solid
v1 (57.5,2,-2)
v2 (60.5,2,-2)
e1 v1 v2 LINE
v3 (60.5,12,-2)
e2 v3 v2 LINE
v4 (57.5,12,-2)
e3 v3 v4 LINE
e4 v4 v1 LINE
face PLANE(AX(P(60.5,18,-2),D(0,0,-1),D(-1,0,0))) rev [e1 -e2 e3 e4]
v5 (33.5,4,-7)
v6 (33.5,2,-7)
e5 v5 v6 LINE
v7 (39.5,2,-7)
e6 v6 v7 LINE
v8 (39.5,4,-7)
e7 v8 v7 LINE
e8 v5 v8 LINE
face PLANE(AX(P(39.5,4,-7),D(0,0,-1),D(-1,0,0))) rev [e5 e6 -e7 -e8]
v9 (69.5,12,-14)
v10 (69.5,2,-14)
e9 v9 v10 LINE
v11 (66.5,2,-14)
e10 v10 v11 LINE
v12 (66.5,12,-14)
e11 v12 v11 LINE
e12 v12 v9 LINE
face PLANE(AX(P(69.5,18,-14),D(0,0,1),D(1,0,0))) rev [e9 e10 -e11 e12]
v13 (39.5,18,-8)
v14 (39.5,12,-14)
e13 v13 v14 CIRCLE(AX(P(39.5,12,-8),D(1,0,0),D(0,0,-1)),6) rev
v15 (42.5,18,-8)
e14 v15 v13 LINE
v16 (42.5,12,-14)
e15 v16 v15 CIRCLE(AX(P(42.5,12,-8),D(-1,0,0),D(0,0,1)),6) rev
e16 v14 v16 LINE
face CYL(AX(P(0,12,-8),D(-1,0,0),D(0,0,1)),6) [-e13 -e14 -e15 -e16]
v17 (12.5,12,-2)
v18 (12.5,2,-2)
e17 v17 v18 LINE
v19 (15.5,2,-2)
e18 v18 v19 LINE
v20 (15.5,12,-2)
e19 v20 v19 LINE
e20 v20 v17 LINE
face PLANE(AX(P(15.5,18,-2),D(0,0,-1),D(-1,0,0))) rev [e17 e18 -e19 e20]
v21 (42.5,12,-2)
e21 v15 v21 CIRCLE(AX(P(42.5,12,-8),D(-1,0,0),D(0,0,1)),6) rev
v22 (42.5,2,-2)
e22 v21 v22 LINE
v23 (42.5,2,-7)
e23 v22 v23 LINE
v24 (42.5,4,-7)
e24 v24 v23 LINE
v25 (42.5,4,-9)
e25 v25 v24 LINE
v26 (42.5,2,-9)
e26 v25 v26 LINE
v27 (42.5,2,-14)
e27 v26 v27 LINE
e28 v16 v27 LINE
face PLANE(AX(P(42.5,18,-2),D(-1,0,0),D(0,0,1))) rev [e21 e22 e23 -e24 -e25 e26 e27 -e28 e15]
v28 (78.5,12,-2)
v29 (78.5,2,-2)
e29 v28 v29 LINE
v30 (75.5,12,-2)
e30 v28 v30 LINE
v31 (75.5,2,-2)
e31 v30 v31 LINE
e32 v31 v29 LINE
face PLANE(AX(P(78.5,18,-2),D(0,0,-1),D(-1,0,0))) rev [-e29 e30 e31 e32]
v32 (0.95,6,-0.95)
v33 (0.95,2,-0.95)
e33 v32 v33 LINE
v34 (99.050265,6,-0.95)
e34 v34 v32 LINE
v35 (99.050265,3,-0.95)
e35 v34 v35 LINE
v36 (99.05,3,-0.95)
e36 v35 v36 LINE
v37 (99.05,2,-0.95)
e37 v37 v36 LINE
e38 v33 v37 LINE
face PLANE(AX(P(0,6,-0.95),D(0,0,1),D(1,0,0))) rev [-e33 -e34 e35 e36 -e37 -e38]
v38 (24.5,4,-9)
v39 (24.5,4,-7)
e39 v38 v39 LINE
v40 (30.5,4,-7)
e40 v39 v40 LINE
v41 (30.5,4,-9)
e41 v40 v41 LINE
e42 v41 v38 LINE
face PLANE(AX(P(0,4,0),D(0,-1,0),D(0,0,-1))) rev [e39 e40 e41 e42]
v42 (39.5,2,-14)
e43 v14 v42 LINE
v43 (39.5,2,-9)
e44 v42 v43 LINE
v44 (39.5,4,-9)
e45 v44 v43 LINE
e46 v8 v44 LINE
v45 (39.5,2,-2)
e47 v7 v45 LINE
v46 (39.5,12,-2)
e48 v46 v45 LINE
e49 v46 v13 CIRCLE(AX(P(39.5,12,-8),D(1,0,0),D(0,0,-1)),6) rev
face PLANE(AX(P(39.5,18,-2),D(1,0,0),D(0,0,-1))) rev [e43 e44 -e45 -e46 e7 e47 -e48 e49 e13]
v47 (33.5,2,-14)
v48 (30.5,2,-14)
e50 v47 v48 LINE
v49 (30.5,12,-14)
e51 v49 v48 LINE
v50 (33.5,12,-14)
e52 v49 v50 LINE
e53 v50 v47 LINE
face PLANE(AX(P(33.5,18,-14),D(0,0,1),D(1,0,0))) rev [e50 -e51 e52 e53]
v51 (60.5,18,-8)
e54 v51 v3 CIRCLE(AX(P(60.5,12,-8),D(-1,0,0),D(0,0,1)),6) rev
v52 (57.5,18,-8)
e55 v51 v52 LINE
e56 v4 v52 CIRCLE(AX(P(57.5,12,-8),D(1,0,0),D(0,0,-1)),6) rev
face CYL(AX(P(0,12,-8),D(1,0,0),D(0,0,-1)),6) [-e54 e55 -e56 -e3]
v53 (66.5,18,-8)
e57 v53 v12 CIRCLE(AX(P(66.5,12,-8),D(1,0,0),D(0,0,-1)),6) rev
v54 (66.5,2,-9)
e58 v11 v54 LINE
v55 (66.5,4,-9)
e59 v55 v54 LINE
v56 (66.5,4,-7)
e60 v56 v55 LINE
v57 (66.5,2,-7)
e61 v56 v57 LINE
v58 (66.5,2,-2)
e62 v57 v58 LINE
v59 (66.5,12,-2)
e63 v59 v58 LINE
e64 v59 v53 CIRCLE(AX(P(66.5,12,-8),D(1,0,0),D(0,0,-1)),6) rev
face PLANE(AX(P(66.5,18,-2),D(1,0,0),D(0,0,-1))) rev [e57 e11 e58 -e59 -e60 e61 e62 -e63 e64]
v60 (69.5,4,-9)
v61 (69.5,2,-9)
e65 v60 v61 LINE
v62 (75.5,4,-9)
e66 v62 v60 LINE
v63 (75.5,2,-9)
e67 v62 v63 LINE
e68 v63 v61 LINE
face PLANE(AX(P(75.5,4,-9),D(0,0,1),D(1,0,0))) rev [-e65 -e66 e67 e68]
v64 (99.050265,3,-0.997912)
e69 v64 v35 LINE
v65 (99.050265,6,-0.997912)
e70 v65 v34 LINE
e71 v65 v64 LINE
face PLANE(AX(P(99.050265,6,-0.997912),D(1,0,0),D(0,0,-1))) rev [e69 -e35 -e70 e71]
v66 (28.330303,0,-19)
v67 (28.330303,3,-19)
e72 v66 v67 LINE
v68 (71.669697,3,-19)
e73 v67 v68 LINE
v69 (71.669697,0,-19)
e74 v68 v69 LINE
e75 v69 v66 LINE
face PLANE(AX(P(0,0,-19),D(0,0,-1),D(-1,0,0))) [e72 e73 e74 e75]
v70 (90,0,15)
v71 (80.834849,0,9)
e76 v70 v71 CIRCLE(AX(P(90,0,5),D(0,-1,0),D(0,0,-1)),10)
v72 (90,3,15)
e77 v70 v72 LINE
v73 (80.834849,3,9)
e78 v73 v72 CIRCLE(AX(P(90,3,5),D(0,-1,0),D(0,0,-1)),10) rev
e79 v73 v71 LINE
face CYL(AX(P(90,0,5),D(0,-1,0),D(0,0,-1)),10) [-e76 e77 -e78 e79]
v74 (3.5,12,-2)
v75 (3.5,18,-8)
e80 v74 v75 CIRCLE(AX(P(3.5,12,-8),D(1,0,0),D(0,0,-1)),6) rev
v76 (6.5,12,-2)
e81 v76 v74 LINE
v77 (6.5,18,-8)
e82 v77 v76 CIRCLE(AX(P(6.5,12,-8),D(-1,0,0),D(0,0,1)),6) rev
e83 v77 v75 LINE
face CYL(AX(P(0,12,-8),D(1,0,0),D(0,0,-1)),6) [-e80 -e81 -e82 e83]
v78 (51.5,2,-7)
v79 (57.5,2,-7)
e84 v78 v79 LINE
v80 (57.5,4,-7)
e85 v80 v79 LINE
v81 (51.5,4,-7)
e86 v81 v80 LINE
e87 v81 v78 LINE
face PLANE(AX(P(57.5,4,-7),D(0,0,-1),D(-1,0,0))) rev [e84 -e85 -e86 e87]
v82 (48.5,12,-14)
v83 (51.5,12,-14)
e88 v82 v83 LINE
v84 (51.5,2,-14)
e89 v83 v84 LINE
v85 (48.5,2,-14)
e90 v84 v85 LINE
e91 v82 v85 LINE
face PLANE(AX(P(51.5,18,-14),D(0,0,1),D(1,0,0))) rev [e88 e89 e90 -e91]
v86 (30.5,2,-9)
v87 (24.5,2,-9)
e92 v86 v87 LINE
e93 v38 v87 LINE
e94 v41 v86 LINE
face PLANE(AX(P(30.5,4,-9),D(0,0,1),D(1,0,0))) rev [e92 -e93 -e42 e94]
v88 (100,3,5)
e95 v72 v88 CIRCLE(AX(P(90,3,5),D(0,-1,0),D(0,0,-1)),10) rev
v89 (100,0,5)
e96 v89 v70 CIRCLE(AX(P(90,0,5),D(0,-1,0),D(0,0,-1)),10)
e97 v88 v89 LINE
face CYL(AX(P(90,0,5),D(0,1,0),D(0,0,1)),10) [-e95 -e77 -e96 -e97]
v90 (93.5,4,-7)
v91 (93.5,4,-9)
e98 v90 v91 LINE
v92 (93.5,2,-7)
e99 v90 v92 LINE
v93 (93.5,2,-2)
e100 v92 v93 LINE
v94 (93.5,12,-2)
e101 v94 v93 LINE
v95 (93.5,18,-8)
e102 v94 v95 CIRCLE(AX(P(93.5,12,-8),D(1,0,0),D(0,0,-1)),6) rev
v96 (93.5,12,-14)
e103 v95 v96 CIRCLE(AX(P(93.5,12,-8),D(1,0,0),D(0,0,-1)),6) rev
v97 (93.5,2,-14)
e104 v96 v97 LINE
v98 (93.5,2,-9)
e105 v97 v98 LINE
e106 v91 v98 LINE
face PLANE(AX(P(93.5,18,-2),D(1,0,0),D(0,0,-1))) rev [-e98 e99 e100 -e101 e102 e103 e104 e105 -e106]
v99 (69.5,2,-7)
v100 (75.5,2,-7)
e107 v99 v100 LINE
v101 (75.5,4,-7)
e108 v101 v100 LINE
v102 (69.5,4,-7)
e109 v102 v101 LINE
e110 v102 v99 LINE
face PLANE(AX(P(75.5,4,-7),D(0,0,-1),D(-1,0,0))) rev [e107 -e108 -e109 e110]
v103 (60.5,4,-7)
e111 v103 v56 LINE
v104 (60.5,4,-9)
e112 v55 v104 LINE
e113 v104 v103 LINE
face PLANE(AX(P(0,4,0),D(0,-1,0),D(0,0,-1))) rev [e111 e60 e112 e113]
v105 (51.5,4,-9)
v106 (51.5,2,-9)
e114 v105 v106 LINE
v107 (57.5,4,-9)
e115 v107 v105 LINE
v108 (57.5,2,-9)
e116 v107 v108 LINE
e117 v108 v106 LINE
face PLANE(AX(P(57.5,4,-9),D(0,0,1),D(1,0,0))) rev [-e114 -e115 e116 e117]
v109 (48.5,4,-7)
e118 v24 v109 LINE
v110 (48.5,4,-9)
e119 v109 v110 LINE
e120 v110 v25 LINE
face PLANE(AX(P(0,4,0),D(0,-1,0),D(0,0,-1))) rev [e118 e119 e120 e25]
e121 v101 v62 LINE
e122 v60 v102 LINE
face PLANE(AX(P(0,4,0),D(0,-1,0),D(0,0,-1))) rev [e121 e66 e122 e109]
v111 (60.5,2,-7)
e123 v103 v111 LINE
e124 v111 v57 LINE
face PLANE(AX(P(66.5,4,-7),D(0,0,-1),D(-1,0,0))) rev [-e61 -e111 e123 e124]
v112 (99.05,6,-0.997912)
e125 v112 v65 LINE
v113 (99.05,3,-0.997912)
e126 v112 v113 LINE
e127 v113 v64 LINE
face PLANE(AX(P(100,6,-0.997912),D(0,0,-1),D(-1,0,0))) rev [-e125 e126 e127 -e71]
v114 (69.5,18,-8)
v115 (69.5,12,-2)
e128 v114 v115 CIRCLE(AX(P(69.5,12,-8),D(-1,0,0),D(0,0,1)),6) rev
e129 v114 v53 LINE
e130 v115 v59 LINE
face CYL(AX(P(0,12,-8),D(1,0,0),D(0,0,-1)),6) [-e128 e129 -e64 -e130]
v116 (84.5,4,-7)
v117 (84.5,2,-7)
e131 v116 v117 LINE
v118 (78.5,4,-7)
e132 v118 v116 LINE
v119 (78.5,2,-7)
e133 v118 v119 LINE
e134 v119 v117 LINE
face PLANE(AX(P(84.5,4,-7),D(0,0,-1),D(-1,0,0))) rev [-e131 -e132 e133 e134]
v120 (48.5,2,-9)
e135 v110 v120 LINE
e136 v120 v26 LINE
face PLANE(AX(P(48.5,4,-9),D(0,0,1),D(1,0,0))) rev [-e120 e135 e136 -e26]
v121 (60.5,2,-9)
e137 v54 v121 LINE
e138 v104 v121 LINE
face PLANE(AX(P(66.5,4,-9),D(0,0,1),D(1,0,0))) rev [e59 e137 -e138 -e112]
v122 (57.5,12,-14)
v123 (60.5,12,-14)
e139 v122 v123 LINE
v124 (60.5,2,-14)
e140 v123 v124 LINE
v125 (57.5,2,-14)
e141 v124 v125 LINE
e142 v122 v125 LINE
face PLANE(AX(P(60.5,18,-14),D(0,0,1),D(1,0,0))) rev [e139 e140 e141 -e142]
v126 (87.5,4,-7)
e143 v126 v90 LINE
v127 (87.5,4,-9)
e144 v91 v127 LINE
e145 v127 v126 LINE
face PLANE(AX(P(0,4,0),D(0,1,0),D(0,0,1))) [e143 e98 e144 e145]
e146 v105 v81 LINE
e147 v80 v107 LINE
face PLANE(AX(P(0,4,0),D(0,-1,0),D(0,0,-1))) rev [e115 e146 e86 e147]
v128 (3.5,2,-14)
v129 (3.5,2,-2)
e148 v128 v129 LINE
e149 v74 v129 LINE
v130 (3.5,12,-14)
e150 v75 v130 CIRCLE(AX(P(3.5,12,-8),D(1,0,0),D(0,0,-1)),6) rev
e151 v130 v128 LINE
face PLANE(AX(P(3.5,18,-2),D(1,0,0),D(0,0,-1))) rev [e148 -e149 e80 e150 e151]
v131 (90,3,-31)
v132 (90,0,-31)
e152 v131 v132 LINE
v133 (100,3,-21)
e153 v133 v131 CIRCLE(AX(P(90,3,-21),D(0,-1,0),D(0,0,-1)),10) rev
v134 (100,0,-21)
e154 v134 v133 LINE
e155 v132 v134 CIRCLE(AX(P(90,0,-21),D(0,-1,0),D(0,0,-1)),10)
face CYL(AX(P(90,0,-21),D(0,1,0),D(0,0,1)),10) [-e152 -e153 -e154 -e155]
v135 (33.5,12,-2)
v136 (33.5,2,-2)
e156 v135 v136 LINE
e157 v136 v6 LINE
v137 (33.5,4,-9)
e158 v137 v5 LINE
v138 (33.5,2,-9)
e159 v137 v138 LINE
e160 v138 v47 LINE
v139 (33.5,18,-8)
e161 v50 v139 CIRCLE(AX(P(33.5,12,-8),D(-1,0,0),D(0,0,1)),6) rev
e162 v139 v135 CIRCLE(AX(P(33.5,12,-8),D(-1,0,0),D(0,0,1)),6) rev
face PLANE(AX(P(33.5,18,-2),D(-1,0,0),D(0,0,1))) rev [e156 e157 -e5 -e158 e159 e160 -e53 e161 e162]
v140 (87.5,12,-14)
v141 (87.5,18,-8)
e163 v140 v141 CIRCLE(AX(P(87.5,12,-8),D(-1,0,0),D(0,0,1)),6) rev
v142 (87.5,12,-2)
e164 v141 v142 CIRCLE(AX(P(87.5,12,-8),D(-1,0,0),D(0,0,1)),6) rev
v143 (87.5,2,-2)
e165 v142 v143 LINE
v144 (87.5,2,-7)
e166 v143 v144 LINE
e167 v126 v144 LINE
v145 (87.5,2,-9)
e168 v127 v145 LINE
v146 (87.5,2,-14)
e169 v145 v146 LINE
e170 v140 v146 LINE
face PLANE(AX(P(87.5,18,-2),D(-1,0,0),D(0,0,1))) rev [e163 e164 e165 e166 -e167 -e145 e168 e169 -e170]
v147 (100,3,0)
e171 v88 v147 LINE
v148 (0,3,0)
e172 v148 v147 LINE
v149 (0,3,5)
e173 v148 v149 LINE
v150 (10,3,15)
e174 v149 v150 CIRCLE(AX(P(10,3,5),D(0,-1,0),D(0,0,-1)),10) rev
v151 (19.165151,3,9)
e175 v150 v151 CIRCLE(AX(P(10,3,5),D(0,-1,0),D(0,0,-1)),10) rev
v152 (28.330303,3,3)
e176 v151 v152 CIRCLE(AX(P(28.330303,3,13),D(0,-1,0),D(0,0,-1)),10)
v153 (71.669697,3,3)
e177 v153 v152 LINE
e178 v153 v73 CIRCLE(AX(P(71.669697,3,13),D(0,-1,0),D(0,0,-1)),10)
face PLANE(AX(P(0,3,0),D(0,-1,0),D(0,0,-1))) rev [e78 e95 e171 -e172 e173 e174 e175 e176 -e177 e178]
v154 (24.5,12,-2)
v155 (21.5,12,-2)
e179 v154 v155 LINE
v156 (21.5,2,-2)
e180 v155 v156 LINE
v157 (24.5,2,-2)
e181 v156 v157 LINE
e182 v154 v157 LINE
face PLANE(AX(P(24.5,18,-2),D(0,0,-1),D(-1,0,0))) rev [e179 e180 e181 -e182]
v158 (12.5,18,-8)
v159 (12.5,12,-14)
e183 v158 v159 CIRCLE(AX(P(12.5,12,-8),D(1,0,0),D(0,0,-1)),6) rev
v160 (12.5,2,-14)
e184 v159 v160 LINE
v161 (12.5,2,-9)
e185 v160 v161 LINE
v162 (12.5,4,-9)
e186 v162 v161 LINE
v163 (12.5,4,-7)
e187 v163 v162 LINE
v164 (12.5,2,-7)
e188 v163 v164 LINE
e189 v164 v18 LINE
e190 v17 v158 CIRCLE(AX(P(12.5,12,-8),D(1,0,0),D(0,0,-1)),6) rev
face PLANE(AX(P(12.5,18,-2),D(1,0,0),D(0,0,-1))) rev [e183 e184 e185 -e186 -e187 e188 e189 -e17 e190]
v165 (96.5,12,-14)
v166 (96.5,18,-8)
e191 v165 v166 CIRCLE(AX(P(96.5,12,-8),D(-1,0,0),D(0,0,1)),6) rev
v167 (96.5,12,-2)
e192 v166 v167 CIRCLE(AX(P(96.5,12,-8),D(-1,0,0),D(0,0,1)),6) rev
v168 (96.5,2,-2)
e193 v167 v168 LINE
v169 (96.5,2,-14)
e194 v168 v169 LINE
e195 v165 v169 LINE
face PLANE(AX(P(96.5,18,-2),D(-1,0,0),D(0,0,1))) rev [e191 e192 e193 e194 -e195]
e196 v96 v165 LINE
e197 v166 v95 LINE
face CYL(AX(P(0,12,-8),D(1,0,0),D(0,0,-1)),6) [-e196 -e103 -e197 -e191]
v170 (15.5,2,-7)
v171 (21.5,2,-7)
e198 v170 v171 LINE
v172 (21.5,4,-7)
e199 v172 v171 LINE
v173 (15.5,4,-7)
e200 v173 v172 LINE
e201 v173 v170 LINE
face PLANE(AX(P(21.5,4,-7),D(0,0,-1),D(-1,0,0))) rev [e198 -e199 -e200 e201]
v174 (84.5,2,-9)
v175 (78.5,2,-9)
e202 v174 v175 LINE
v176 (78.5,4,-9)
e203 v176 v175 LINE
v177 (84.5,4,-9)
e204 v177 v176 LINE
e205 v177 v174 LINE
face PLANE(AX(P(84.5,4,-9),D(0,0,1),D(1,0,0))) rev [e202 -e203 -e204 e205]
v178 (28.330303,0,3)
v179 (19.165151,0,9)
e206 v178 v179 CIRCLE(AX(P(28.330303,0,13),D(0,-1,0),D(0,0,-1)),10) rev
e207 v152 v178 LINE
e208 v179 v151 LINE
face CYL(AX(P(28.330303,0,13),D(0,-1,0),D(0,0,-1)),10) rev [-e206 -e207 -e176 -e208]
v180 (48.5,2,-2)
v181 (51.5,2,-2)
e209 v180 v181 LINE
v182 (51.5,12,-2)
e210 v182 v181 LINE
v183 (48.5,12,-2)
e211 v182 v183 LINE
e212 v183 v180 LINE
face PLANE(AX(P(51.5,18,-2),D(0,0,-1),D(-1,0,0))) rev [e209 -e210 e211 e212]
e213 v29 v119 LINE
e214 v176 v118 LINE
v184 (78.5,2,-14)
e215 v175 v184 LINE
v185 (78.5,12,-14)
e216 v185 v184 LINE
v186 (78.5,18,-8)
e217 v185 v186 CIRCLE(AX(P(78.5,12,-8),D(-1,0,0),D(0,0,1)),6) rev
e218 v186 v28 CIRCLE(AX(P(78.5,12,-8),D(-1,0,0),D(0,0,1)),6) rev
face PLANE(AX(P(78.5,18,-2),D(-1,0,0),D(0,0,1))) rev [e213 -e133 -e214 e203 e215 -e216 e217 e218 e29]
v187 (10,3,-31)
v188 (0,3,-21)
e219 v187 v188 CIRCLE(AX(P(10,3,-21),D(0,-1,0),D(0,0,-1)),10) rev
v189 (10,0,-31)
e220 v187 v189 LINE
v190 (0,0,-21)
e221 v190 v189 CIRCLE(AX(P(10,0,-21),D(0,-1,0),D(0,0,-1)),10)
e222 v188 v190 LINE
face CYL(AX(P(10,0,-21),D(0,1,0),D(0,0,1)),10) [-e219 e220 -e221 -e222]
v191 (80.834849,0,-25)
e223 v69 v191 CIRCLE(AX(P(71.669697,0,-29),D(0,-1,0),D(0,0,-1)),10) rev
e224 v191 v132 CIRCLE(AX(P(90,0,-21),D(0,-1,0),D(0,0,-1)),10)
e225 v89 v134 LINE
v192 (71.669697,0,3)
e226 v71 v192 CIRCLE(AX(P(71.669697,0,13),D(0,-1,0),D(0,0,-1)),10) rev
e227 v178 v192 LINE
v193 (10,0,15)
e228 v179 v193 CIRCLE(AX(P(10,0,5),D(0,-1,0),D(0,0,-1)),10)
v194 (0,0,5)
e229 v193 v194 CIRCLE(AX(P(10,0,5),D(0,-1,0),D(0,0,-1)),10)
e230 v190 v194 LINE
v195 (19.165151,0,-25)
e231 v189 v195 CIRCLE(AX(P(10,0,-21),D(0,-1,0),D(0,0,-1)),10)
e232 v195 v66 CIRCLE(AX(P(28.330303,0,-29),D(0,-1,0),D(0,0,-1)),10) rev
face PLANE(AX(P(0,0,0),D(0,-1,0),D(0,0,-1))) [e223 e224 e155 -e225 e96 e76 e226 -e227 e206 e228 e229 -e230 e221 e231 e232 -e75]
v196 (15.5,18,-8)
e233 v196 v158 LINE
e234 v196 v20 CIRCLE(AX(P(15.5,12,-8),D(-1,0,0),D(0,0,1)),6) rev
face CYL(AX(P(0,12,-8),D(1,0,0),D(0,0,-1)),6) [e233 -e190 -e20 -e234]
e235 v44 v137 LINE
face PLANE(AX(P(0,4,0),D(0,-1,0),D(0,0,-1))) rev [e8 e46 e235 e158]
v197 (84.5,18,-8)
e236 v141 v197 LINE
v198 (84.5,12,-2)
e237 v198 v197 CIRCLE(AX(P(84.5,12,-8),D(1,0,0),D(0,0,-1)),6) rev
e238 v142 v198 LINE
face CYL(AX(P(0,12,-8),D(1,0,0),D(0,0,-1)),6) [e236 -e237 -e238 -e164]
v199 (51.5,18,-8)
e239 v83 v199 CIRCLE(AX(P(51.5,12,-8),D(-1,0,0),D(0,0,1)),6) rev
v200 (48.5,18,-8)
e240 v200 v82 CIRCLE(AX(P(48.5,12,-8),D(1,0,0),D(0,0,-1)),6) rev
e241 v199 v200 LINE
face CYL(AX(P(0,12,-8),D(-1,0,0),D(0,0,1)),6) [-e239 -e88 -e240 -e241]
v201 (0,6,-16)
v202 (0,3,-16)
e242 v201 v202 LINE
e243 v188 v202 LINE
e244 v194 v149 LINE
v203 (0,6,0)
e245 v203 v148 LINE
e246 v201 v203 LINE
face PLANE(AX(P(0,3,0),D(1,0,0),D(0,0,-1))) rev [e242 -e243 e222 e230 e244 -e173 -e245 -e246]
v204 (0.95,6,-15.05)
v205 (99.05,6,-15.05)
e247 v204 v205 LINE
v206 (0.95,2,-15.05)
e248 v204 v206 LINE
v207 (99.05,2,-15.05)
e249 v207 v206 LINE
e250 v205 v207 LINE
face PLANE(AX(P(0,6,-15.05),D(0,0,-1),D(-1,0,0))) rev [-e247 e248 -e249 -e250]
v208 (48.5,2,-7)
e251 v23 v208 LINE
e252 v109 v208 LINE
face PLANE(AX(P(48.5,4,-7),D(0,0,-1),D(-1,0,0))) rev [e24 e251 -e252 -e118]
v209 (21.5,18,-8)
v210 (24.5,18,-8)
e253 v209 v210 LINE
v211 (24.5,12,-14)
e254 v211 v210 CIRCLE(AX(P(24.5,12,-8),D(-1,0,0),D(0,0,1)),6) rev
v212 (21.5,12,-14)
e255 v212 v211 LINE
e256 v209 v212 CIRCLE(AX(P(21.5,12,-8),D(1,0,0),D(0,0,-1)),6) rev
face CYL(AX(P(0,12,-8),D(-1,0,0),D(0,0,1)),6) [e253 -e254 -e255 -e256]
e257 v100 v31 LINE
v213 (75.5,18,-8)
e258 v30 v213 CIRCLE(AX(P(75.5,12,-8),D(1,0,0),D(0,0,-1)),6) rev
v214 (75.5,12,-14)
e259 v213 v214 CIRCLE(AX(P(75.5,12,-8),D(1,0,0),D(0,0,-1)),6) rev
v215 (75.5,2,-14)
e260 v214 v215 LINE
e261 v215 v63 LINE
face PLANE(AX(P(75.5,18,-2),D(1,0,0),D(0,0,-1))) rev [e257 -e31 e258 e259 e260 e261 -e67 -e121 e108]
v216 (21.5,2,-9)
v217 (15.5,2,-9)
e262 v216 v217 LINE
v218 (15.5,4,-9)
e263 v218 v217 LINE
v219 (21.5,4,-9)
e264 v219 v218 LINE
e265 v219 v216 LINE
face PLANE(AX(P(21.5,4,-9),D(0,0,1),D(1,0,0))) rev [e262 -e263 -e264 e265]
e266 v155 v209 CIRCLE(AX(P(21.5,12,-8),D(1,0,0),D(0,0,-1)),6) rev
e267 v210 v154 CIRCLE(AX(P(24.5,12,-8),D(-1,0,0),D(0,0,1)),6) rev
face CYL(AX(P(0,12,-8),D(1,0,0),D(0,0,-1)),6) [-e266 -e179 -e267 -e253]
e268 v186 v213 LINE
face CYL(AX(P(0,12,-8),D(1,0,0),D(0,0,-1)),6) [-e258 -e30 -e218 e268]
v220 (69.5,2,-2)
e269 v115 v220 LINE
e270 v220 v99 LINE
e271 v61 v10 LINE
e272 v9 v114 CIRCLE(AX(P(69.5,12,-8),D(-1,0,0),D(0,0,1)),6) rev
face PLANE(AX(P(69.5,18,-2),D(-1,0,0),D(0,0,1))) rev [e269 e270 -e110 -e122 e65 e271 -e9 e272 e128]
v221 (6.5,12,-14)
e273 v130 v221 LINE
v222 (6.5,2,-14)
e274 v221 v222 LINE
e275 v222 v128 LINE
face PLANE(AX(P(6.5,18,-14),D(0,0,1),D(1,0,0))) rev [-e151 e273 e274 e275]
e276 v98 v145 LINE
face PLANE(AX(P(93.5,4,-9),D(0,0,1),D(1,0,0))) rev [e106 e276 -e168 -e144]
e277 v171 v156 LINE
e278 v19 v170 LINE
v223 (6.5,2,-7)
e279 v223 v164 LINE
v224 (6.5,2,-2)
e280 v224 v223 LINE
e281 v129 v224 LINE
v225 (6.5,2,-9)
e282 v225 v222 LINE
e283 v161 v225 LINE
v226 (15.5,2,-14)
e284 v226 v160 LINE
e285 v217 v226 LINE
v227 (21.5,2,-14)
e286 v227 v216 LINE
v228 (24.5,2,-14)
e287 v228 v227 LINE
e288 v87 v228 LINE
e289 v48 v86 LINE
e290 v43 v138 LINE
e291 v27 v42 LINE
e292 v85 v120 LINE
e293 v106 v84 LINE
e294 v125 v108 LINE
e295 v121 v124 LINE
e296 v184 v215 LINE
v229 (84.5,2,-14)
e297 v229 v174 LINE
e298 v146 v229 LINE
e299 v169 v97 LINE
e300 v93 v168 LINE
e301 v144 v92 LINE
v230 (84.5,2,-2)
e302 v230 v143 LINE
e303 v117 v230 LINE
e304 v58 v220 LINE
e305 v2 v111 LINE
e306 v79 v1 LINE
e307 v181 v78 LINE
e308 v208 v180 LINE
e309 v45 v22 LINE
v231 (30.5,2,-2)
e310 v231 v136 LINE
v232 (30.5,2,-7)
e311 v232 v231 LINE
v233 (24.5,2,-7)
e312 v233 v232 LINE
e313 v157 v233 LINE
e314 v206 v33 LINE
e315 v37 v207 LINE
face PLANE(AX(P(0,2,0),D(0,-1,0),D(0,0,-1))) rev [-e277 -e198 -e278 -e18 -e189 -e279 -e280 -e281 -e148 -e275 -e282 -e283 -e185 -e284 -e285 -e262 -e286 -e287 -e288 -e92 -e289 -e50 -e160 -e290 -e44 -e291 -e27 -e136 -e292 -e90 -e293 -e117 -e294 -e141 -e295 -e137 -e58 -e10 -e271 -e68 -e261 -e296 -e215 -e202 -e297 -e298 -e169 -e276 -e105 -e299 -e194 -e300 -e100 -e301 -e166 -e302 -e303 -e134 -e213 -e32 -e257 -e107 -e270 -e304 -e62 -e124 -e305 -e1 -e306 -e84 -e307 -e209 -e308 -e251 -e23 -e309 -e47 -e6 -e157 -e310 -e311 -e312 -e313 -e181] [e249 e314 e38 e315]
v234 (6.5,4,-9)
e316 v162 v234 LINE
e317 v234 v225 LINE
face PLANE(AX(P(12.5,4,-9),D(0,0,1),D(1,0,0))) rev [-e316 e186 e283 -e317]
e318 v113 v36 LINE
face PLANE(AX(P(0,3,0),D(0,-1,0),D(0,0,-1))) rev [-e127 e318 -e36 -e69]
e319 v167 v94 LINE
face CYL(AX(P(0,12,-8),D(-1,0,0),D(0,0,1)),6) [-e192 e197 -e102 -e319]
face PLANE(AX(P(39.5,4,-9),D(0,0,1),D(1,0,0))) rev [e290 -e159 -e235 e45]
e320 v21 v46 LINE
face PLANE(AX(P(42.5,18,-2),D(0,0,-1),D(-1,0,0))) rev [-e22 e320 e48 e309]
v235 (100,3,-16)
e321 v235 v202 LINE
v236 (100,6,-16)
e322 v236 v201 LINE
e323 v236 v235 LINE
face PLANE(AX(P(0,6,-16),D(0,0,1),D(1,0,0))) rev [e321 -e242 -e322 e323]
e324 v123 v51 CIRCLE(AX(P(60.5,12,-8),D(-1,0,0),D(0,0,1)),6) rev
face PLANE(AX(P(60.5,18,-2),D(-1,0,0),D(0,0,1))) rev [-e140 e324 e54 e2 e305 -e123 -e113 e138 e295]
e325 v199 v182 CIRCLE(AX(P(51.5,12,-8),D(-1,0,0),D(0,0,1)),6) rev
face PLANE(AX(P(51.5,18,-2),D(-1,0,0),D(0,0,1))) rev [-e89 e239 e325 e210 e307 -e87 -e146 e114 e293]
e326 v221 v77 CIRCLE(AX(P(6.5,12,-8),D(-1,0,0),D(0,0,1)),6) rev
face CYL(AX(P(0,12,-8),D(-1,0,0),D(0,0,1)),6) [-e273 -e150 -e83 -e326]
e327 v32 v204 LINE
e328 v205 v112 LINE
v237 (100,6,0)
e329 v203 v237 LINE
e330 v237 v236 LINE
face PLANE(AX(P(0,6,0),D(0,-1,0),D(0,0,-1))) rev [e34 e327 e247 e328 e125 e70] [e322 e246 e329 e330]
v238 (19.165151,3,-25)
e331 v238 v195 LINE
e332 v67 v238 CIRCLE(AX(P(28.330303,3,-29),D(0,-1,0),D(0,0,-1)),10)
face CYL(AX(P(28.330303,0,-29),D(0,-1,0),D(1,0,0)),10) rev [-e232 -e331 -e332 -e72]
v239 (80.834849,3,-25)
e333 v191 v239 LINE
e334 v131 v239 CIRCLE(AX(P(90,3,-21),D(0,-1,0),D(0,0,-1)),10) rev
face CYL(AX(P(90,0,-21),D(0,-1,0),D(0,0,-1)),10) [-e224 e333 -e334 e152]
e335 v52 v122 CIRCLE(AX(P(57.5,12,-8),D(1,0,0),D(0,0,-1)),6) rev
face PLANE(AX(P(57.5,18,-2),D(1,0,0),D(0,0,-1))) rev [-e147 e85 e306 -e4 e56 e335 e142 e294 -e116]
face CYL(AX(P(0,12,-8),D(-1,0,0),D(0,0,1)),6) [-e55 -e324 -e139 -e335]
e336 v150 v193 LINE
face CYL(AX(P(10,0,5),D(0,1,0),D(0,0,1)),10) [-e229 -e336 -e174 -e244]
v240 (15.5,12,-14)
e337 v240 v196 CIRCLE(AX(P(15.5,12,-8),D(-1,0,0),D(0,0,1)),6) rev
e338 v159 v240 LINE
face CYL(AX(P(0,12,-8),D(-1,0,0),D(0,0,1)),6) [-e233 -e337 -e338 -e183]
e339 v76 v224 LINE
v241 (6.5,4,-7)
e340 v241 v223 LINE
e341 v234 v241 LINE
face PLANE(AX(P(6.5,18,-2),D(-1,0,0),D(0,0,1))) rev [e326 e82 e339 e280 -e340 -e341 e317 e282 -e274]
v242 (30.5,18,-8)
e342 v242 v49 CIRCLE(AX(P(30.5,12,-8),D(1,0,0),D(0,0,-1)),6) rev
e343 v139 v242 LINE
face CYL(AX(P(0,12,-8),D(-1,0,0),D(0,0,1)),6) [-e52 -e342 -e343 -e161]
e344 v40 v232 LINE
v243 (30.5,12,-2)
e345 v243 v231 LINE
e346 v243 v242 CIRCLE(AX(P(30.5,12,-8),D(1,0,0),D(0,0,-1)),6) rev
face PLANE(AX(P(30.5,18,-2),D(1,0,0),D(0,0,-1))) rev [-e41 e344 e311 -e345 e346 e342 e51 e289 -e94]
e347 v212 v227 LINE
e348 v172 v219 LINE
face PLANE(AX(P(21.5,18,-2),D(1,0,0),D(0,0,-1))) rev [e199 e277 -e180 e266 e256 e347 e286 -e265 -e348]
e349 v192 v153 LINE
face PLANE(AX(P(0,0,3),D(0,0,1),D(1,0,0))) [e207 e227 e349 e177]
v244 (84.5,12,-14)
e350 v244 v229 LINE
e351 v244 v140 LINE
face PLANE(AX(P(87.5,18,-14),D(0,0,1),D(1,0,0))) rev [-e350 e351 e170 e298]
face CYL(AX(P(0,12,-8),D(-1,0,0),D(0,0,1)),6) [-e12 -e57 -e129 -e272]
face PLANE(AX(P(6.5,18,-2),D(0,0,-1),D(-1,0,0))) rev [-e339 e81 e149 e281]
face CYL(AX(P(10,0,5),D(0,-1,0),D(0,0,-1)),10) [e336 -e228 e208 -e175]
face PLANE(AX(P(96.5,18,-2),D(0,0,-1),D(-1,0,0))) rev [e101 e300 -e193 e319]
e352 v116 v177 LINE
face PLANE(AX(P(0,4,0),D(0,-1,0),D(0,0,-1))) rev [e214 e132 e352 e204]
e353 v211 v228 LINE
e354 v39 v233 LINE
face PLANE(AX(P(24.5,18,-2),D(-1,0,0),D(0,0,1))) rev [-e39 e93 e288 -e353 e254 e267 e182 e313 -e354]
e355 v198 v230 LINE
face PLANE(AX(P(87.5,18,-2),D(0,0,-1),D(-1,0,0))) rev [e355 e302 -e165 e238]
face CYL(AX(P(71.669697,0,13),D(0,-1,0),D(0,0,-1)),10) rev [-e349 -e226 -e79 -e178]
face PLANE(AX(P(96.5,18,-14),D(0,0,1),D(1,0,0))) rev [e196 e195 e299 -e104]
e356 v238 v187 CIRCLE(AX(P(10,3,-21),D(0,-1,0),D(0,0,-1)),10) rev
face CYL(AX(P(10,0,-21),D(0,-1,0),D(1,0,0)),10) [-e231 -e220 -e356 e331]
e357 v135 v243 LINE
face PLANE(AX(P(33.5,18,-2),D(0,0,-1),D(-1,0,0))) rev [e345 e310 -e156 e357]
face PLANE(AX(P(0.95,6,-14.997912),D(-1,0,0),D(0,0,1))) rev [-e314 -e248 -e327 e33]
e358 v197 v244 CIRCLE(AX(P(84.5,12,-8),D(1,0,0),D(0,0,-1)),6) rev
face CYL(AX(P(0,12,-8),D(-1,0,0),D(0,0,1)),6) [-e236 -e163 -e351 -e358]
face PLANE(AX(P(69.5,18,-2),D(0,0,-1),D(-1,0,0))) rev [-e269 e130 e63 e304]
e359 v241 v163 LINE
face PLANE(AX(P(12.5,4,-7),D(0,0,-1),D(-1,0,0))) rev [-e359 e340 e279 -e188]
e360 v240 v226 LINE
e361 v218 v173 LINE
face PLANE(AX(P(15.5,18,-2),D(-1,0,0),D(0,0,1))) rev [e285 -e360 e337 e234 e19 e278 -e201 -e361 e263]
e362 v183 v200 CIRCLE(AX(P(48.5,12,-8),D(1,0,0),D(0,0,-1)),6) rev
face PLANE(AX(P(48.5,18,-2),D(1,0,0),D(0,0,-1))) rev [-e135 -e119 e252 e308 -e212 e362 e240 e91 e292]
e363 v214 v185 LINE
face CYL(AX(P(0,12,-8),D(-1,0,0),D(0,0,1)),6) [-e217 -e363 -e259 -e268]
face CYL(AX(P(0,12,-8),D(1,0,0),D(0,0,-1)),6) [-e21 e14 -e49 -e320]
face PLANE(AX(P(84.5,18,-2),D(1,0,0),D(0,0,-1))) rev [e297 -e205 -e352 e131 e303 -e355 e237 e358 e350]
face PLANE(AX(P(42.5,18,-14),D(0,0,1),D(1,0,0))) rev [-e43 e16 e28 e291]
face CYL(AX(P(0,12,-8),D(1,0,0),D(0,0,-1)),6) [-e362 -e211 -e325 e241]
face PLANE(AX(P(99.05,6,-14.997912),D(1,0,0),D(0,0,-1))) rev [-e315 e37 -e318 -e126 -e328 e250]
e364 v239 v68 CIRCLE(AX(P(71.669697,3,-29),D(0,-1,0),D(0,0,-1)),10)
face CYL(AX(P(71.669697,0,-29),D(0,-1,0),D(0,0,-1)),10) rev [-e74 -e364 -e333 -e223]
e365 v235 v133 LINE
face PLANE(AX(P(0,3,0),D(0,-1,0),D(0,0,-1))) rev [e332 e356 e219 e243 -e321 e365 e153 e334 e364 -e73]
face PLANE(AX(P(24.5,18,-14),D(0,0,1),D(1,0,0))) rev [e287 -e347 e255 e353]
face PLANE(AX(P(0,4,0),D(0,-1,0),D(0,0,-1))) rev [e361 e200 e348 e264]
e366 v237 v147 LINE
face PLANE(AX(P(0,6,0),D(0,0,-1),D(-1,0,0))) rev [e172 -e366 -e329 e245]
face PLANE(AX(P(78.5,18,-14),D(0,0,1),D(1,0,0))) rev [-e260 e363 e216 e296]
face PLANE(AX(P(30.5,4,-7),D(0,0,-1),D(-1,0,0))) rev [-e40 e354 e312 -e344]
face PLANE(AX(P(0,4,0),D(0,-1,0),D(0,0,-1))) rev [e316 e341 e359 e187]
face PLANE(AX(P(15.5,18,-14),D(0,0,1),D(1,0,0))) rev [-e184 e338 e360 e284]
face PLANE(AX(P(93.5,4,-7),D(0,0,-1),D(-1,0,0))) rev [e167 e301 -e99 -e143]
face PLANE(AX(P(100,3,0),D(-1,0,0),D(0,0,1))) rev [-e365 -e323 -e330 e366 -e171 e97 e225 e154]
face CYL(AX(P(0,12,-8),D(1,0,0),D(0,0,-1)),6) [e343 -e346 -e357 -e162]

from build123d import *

# Parameters (mm, degrees)
SKETCH1_W            = 100
SKETCH1_H            = 16
BOSS_EXTRUDE1_DEPTH  = 3
SKETCH2_W            = 98
SKETCH2_H            = 14
CUT_EXTRUDE1_DEPTH   = 1
SKETCH5_W            = 20
SKETCH5_H            = 3
BOSS_EXTRUDE4_DEPTH  = 15
SKETCH6_W            = 20
SKETCH6_H            = 3
BOSS_EXTRUDE5_DEPTH  = 15
FILLET18_R           = 10
SKETCH7_W            = 3
SKETCH7_H            = 12
BOSS_EXTRUDE6_DEPTH  = 16
SKETCH8_W            = 6
SKETCH8_H            = 2
BOSS_EXTRUDE7_DEPTH  = 2
FILLET19_R           = 6
SKETCH10_W           = 60
SKETCH10_H           = 3
BOSS_EXTRUDE8_DEPTH  = 3
SKETCH11_W           = 60
SKETCH11_H           = 3
BOSS_EXTRUDE9_DEPTH  = 3
SKETCH12_W           = 0.95
SKETCH12_H           = 14
BOSS_EXTRUDE10_DEPTH = 3
SKETCH13_W           = 100
SKETCH13_H           = 0.95
BOSS_EXTRUDE11_DEPTH = 3
SKETCH14_W           = 0.95
SKETCH14_H           = 0.052088128
BOSS_EXTRUDE12_DEPTH = 3
SKETCH15_W           = 0.95
SKETCH15_H           = 0.047911872
SKETCH15_W_2         = 0.949734752
SKETCH15_H_2         = 0.052088128
BOSS_EXTRUDE13_DEPTH = 3
FILLET20_R           = 10
SKETCH17_W           = 98.1
SKETCH17_H           = 14.1
SKETCH17_W_2         = 97.1
SKETCH17_H_2         = 13.1
CUT_EXTRUDE2_DEPTH   = 4


with BuildPart() as part:
    # Sketch1 → Boss-Extrude1 (new body)
    with BuildSketch(Plane(origin=(0, 0, 0), x_dir=(1, 0, 0), z_dir=(0, 1, 0))):
        with Locations((50, 8)):
            Rectangle(SKETCH1_W, SKETCH1_H)
    extrude(amount=BOSS_EXTRUDE1_DEPTH)

    # Sketch2 → Cut-Extrude1 (cut)
    with BuildSketch(Plane(origin=(0, 3, 0), x_dir=(1, 0, 0), z_dir=(0, 1, 0))):
        with Locations((50, 8)):
            Rectangle(SKETCH2_W, SKETCH2_H)
    extrude(amount=-CUT_EXTRUDE1_DEPTH, mode=Mode.SUBTRACT)

    # Sketch5 → Boss-Extrude4 (add)
    with BuildSketch(Plane.XY):
        with Locations((10, 1.5)):
            Rectangle(SKETCH5_W, SKETCH5_H)
        with Locations((90, 1.5)):
            Rectangle(SKETCH5_W, SKETCH5_H)
    extrude(amount=BOSS_EXTRUDE4_DEPTH)

    # Sketch6 → Boss-Extrude5 (add)
    with BuildSketch(Plane(origin=(0, 0, -16), x_dir=(-1, 0, 0), z_dir=(0, 0, -1))):
        with Locations((-90, 1.5)):
            Rectangle(SKETCH6_W, SKETCH6_H)
        with Locations((-10, 1.5)):
            Rectangle(SKETCH6_W, SKETCH6_H)
    extrude(amount=BOSS_EXTRUDE5_DEPTH)

    # Fillet18
    fillet18_edges = [part.edges().sort_by_distance(p)[0] for p in [
        (20, 1.5, 15),
        (0, 1.5, 15),
        (80, 1.5, 15),
        (100, 1.5, 15),
        (0, 1.5, -31),
        (20, 1.5, -31),
        (80, 1.5, -31),
        (100, 1.5, -31),
    ]]
    fillet(fillet18_edges, radius=FILLET18_R - 0.0001)  # a hair under: the kernel refuses the full size

    # Sketch7 → Boss-Extrude6 (add)
    with BuildSketch(Plane(origin=(0, 2, 0), x_dir=(1, 0, 0), z_dir=(0, 1, 0))):
        with Locations((95, 8)):
            Rectangle(SKETCH7_W, SKETCH7_H)
        with Locations((86, 8)):
            Rectangle(SKETCH7_W, SKETCH7_H)
        with Locations((77, 8)):
            Rectangle(SKETCH7_W, SKETCH7_H)
        with Locations((68, 8)):
            Rectangle(SKETCH7_W, SKETCH7_H)
        with Locations((59, 8)):
            Rectangle(SKETCH7_W, SKETCH7_H)
        with Locations((50, 8)):
            Rectangle(SKETCH7_W, SKETCH7_H)
        with Locations((41, 8)):
            Rectangle(SKETCH7_W, SKETCH7_H)
        with Locations((32, 8)):
            Rectangle(SKETCH7_W, SKETCH7_H)
        with Locations((23, 8)):
            Rectangle(SKETCH7_W, SKETCH7_H)
        with Locations((14, 8)):
            Rectangle(SKETCH7_W, SKETCH7_H)
        with Locations((5, 8)):
            Rectangle(SKETCH7_W, SKETCH7_H)
    extrude(amount=BOSS_EXTRUDE6_DEPTH)

    # Sketch8 → Boss-Extrude7 (add)
    with BuildSketch(Plane(origin=(0, 2, 0), x_dir=(1, 0, 0), z_dir=(0, 1, 0))):
        with Locations((90.5, 8)):
            Rectangle(SKETCH8_W, SKETCH8_H)
        with Locations((81.5, 8)):
            Rectangle(SKETCH8_W, SKETCH8_H)
        with Locations((72.5, 8)):
            Rectangle(SKETCH8_W, SKETCH8_H)
        with Locations((63.5, 8)):
            Rectangle(SKETCH8_W, SKETCH8_H)
        with Locations((54.5, 8)):
            Rectangle(SKETCH8_W, SKETCH8_H)
        with Locations((45.5, 8)):
            Rectangle(SKETCH8_W, SKETCH8_H)
        with Locations((36.5, 8)):
            Rectangle(SKETCH8_W, SKETCH8_H)
        with Locations((27.5, 8)):
            Rectangle(SKETCH8_W, SKETCH8_H)
        with Locations((18.5, 8)):
            Rectangle(SKETCH8_W, SKETCH8_H)
        with Locations((9.5, 8)):
            Rectangle(SKETCH8_W, SKETCH8_H)
    extrude(amount=BOSS_EXTRUDE7_DEPTH)

    # Fillet19
    fillet19_edges = [part.edges().sort_by_distance(p)[0] for p in [
        (95, 18, -2),
        (95, 18, -14),
        (86, 18, -2),
        (86, 18, -14),
        (77, 18, -2),
        (77, 18, -14),
        (68, 18, -2),
        (68, 18, -14),
        (59, 18, -2),
        (59, 18, -14),
        (50, 18, -2),
        (50, 18, -14),
        (41, 18, -2),
        (41, 18, -14),
        (32, 18, -2),
        (32, 18, -14),
        (23, 18, -14),
        (23, 18, -2),
        (14, 18, -2),
        (14, 18, -14),
        (5, 18, -2),
        (5, 18, -14),
    ]]
    fillet(fillet19_edges, radius=FILLET19_R - 0.0001)  # a hair under: the kernel refuses the full size

    # Sketch10 → Boss-Extrude8 (add)
    with BuildSketch(Plane(origin=(0, 0, -16), x_dir=(-1, 0, 0), z_dir=(0, 0, -1))):
        with Locations((-50, 1.5)):
            Rectangle(SKETCH10_W, SKETCH10_H)
    extrude(amount=BOSS_EXTRUDE8_DEPTH)

    # Sketch11 → Boss-Extrude9 (add)
    with BuildSketch(Plane.XY):
        with Locations((50, 1.5)):
            Rectangle(SKETCH11_W, SKETCH11_H)
    extrude(amount=BOSS_EXTRUDE9_DEPTH)

    # Sketch12 → Boss-Extrude10 (add)
    with BuildSketch(Plane(origin=(0, 3, 0), x_dir=(1, 0, 0), z_dir=(0, 1, 0))):
        with Locations((99.525, 7.997911872)):
            Rectangle(SKETCH12_W, SKETCH12_H)
        with Locations((0.475, 7.997911872)):
            Rectangle(SKETCH12_W, SKETCH12_H)
    extrude(amount=BOSS_EXTRUDE10_DEPTH)

    # Sketch13 → Boss-Extrude11 (add)
    with BuildSketch(Plane(origin=(0, 3, 0), x_dir=(1, 0, 0), z_dir=(0, 1, 0))):
        with Locations((50, 15.525)):
            Rectangle(SKETCH13_W, SKETCH13_H)
        with Locations((50, 0.475)):
            Rectangle(SKETCH13_W, SKETCH13_H)
    extrude(amount=BOSS_EXTRUDE11_DEPTH)

    # Sketch14 → Boss-Extrude12 (add)
    with BuildSketch(Plane(origin=(0, 3, 0), x_dir=(1, 0, 0), z_dir=(0, 1, 0))):
        with Locations((0.475, 15.023955936)):
            Rectangle(SKETCH14_W, SKETCH14_H)
    extrude(amount=BOSS_EXTRUDE12_DEPTH)

    # Sketch15 → Boss-Extrude13 (add)
    with BuildSketch(Plane(origin=(0, 3, 0), x_dir=(1, 0, 0), z_dir=(0, 1, 0))):
        with Locations((0.475, 0.973955936)):
            Rectangle(SKETCH15_W, SKETCH15_H)
        with Locations((99.525132624, 0.973955936)):
            Rectangle(SKETCH15_W_2, SKETCH15_H)
        with Locations((99.525, 15.023955936)):
            Rectangle(SKETCH15_W, SKETCH15_H_2)
    extrude(amount=BOSS_EXTRUDE13_DEPTH)

    # Fillet20
    fillet20_edges = [part.edges().sort_by_distance(p)[0] for p in [
        (20, 1.5, -19),
        (80, 1.5, -19),
        (80, 1.5, 3),
        (20, 1.5, 3),
    ]]
    fillet(fillet20_edges, radius=FILLET20_R)

    # Sketch17 → Cut-Extrude2 (cut)
    with BuildSketch(Plane(origin=(0, 6, 0), x_dir=(1, 0, 0), z_dir=(0, 1, 0))):
        with Locations((50, 8)):
            Rectangle(SKETCH17_W, SKETCH17_H)
        with Locations((50, 8)):
            Rectangle(SKETCH17_W_2, SKETCH17_H_2, mode=Mode.SUBTRACT)
    extrude(amount=-CUT_EXTRUDE2_DEPTH, mode=Mode.SUBTRACT)


solid = part.part
